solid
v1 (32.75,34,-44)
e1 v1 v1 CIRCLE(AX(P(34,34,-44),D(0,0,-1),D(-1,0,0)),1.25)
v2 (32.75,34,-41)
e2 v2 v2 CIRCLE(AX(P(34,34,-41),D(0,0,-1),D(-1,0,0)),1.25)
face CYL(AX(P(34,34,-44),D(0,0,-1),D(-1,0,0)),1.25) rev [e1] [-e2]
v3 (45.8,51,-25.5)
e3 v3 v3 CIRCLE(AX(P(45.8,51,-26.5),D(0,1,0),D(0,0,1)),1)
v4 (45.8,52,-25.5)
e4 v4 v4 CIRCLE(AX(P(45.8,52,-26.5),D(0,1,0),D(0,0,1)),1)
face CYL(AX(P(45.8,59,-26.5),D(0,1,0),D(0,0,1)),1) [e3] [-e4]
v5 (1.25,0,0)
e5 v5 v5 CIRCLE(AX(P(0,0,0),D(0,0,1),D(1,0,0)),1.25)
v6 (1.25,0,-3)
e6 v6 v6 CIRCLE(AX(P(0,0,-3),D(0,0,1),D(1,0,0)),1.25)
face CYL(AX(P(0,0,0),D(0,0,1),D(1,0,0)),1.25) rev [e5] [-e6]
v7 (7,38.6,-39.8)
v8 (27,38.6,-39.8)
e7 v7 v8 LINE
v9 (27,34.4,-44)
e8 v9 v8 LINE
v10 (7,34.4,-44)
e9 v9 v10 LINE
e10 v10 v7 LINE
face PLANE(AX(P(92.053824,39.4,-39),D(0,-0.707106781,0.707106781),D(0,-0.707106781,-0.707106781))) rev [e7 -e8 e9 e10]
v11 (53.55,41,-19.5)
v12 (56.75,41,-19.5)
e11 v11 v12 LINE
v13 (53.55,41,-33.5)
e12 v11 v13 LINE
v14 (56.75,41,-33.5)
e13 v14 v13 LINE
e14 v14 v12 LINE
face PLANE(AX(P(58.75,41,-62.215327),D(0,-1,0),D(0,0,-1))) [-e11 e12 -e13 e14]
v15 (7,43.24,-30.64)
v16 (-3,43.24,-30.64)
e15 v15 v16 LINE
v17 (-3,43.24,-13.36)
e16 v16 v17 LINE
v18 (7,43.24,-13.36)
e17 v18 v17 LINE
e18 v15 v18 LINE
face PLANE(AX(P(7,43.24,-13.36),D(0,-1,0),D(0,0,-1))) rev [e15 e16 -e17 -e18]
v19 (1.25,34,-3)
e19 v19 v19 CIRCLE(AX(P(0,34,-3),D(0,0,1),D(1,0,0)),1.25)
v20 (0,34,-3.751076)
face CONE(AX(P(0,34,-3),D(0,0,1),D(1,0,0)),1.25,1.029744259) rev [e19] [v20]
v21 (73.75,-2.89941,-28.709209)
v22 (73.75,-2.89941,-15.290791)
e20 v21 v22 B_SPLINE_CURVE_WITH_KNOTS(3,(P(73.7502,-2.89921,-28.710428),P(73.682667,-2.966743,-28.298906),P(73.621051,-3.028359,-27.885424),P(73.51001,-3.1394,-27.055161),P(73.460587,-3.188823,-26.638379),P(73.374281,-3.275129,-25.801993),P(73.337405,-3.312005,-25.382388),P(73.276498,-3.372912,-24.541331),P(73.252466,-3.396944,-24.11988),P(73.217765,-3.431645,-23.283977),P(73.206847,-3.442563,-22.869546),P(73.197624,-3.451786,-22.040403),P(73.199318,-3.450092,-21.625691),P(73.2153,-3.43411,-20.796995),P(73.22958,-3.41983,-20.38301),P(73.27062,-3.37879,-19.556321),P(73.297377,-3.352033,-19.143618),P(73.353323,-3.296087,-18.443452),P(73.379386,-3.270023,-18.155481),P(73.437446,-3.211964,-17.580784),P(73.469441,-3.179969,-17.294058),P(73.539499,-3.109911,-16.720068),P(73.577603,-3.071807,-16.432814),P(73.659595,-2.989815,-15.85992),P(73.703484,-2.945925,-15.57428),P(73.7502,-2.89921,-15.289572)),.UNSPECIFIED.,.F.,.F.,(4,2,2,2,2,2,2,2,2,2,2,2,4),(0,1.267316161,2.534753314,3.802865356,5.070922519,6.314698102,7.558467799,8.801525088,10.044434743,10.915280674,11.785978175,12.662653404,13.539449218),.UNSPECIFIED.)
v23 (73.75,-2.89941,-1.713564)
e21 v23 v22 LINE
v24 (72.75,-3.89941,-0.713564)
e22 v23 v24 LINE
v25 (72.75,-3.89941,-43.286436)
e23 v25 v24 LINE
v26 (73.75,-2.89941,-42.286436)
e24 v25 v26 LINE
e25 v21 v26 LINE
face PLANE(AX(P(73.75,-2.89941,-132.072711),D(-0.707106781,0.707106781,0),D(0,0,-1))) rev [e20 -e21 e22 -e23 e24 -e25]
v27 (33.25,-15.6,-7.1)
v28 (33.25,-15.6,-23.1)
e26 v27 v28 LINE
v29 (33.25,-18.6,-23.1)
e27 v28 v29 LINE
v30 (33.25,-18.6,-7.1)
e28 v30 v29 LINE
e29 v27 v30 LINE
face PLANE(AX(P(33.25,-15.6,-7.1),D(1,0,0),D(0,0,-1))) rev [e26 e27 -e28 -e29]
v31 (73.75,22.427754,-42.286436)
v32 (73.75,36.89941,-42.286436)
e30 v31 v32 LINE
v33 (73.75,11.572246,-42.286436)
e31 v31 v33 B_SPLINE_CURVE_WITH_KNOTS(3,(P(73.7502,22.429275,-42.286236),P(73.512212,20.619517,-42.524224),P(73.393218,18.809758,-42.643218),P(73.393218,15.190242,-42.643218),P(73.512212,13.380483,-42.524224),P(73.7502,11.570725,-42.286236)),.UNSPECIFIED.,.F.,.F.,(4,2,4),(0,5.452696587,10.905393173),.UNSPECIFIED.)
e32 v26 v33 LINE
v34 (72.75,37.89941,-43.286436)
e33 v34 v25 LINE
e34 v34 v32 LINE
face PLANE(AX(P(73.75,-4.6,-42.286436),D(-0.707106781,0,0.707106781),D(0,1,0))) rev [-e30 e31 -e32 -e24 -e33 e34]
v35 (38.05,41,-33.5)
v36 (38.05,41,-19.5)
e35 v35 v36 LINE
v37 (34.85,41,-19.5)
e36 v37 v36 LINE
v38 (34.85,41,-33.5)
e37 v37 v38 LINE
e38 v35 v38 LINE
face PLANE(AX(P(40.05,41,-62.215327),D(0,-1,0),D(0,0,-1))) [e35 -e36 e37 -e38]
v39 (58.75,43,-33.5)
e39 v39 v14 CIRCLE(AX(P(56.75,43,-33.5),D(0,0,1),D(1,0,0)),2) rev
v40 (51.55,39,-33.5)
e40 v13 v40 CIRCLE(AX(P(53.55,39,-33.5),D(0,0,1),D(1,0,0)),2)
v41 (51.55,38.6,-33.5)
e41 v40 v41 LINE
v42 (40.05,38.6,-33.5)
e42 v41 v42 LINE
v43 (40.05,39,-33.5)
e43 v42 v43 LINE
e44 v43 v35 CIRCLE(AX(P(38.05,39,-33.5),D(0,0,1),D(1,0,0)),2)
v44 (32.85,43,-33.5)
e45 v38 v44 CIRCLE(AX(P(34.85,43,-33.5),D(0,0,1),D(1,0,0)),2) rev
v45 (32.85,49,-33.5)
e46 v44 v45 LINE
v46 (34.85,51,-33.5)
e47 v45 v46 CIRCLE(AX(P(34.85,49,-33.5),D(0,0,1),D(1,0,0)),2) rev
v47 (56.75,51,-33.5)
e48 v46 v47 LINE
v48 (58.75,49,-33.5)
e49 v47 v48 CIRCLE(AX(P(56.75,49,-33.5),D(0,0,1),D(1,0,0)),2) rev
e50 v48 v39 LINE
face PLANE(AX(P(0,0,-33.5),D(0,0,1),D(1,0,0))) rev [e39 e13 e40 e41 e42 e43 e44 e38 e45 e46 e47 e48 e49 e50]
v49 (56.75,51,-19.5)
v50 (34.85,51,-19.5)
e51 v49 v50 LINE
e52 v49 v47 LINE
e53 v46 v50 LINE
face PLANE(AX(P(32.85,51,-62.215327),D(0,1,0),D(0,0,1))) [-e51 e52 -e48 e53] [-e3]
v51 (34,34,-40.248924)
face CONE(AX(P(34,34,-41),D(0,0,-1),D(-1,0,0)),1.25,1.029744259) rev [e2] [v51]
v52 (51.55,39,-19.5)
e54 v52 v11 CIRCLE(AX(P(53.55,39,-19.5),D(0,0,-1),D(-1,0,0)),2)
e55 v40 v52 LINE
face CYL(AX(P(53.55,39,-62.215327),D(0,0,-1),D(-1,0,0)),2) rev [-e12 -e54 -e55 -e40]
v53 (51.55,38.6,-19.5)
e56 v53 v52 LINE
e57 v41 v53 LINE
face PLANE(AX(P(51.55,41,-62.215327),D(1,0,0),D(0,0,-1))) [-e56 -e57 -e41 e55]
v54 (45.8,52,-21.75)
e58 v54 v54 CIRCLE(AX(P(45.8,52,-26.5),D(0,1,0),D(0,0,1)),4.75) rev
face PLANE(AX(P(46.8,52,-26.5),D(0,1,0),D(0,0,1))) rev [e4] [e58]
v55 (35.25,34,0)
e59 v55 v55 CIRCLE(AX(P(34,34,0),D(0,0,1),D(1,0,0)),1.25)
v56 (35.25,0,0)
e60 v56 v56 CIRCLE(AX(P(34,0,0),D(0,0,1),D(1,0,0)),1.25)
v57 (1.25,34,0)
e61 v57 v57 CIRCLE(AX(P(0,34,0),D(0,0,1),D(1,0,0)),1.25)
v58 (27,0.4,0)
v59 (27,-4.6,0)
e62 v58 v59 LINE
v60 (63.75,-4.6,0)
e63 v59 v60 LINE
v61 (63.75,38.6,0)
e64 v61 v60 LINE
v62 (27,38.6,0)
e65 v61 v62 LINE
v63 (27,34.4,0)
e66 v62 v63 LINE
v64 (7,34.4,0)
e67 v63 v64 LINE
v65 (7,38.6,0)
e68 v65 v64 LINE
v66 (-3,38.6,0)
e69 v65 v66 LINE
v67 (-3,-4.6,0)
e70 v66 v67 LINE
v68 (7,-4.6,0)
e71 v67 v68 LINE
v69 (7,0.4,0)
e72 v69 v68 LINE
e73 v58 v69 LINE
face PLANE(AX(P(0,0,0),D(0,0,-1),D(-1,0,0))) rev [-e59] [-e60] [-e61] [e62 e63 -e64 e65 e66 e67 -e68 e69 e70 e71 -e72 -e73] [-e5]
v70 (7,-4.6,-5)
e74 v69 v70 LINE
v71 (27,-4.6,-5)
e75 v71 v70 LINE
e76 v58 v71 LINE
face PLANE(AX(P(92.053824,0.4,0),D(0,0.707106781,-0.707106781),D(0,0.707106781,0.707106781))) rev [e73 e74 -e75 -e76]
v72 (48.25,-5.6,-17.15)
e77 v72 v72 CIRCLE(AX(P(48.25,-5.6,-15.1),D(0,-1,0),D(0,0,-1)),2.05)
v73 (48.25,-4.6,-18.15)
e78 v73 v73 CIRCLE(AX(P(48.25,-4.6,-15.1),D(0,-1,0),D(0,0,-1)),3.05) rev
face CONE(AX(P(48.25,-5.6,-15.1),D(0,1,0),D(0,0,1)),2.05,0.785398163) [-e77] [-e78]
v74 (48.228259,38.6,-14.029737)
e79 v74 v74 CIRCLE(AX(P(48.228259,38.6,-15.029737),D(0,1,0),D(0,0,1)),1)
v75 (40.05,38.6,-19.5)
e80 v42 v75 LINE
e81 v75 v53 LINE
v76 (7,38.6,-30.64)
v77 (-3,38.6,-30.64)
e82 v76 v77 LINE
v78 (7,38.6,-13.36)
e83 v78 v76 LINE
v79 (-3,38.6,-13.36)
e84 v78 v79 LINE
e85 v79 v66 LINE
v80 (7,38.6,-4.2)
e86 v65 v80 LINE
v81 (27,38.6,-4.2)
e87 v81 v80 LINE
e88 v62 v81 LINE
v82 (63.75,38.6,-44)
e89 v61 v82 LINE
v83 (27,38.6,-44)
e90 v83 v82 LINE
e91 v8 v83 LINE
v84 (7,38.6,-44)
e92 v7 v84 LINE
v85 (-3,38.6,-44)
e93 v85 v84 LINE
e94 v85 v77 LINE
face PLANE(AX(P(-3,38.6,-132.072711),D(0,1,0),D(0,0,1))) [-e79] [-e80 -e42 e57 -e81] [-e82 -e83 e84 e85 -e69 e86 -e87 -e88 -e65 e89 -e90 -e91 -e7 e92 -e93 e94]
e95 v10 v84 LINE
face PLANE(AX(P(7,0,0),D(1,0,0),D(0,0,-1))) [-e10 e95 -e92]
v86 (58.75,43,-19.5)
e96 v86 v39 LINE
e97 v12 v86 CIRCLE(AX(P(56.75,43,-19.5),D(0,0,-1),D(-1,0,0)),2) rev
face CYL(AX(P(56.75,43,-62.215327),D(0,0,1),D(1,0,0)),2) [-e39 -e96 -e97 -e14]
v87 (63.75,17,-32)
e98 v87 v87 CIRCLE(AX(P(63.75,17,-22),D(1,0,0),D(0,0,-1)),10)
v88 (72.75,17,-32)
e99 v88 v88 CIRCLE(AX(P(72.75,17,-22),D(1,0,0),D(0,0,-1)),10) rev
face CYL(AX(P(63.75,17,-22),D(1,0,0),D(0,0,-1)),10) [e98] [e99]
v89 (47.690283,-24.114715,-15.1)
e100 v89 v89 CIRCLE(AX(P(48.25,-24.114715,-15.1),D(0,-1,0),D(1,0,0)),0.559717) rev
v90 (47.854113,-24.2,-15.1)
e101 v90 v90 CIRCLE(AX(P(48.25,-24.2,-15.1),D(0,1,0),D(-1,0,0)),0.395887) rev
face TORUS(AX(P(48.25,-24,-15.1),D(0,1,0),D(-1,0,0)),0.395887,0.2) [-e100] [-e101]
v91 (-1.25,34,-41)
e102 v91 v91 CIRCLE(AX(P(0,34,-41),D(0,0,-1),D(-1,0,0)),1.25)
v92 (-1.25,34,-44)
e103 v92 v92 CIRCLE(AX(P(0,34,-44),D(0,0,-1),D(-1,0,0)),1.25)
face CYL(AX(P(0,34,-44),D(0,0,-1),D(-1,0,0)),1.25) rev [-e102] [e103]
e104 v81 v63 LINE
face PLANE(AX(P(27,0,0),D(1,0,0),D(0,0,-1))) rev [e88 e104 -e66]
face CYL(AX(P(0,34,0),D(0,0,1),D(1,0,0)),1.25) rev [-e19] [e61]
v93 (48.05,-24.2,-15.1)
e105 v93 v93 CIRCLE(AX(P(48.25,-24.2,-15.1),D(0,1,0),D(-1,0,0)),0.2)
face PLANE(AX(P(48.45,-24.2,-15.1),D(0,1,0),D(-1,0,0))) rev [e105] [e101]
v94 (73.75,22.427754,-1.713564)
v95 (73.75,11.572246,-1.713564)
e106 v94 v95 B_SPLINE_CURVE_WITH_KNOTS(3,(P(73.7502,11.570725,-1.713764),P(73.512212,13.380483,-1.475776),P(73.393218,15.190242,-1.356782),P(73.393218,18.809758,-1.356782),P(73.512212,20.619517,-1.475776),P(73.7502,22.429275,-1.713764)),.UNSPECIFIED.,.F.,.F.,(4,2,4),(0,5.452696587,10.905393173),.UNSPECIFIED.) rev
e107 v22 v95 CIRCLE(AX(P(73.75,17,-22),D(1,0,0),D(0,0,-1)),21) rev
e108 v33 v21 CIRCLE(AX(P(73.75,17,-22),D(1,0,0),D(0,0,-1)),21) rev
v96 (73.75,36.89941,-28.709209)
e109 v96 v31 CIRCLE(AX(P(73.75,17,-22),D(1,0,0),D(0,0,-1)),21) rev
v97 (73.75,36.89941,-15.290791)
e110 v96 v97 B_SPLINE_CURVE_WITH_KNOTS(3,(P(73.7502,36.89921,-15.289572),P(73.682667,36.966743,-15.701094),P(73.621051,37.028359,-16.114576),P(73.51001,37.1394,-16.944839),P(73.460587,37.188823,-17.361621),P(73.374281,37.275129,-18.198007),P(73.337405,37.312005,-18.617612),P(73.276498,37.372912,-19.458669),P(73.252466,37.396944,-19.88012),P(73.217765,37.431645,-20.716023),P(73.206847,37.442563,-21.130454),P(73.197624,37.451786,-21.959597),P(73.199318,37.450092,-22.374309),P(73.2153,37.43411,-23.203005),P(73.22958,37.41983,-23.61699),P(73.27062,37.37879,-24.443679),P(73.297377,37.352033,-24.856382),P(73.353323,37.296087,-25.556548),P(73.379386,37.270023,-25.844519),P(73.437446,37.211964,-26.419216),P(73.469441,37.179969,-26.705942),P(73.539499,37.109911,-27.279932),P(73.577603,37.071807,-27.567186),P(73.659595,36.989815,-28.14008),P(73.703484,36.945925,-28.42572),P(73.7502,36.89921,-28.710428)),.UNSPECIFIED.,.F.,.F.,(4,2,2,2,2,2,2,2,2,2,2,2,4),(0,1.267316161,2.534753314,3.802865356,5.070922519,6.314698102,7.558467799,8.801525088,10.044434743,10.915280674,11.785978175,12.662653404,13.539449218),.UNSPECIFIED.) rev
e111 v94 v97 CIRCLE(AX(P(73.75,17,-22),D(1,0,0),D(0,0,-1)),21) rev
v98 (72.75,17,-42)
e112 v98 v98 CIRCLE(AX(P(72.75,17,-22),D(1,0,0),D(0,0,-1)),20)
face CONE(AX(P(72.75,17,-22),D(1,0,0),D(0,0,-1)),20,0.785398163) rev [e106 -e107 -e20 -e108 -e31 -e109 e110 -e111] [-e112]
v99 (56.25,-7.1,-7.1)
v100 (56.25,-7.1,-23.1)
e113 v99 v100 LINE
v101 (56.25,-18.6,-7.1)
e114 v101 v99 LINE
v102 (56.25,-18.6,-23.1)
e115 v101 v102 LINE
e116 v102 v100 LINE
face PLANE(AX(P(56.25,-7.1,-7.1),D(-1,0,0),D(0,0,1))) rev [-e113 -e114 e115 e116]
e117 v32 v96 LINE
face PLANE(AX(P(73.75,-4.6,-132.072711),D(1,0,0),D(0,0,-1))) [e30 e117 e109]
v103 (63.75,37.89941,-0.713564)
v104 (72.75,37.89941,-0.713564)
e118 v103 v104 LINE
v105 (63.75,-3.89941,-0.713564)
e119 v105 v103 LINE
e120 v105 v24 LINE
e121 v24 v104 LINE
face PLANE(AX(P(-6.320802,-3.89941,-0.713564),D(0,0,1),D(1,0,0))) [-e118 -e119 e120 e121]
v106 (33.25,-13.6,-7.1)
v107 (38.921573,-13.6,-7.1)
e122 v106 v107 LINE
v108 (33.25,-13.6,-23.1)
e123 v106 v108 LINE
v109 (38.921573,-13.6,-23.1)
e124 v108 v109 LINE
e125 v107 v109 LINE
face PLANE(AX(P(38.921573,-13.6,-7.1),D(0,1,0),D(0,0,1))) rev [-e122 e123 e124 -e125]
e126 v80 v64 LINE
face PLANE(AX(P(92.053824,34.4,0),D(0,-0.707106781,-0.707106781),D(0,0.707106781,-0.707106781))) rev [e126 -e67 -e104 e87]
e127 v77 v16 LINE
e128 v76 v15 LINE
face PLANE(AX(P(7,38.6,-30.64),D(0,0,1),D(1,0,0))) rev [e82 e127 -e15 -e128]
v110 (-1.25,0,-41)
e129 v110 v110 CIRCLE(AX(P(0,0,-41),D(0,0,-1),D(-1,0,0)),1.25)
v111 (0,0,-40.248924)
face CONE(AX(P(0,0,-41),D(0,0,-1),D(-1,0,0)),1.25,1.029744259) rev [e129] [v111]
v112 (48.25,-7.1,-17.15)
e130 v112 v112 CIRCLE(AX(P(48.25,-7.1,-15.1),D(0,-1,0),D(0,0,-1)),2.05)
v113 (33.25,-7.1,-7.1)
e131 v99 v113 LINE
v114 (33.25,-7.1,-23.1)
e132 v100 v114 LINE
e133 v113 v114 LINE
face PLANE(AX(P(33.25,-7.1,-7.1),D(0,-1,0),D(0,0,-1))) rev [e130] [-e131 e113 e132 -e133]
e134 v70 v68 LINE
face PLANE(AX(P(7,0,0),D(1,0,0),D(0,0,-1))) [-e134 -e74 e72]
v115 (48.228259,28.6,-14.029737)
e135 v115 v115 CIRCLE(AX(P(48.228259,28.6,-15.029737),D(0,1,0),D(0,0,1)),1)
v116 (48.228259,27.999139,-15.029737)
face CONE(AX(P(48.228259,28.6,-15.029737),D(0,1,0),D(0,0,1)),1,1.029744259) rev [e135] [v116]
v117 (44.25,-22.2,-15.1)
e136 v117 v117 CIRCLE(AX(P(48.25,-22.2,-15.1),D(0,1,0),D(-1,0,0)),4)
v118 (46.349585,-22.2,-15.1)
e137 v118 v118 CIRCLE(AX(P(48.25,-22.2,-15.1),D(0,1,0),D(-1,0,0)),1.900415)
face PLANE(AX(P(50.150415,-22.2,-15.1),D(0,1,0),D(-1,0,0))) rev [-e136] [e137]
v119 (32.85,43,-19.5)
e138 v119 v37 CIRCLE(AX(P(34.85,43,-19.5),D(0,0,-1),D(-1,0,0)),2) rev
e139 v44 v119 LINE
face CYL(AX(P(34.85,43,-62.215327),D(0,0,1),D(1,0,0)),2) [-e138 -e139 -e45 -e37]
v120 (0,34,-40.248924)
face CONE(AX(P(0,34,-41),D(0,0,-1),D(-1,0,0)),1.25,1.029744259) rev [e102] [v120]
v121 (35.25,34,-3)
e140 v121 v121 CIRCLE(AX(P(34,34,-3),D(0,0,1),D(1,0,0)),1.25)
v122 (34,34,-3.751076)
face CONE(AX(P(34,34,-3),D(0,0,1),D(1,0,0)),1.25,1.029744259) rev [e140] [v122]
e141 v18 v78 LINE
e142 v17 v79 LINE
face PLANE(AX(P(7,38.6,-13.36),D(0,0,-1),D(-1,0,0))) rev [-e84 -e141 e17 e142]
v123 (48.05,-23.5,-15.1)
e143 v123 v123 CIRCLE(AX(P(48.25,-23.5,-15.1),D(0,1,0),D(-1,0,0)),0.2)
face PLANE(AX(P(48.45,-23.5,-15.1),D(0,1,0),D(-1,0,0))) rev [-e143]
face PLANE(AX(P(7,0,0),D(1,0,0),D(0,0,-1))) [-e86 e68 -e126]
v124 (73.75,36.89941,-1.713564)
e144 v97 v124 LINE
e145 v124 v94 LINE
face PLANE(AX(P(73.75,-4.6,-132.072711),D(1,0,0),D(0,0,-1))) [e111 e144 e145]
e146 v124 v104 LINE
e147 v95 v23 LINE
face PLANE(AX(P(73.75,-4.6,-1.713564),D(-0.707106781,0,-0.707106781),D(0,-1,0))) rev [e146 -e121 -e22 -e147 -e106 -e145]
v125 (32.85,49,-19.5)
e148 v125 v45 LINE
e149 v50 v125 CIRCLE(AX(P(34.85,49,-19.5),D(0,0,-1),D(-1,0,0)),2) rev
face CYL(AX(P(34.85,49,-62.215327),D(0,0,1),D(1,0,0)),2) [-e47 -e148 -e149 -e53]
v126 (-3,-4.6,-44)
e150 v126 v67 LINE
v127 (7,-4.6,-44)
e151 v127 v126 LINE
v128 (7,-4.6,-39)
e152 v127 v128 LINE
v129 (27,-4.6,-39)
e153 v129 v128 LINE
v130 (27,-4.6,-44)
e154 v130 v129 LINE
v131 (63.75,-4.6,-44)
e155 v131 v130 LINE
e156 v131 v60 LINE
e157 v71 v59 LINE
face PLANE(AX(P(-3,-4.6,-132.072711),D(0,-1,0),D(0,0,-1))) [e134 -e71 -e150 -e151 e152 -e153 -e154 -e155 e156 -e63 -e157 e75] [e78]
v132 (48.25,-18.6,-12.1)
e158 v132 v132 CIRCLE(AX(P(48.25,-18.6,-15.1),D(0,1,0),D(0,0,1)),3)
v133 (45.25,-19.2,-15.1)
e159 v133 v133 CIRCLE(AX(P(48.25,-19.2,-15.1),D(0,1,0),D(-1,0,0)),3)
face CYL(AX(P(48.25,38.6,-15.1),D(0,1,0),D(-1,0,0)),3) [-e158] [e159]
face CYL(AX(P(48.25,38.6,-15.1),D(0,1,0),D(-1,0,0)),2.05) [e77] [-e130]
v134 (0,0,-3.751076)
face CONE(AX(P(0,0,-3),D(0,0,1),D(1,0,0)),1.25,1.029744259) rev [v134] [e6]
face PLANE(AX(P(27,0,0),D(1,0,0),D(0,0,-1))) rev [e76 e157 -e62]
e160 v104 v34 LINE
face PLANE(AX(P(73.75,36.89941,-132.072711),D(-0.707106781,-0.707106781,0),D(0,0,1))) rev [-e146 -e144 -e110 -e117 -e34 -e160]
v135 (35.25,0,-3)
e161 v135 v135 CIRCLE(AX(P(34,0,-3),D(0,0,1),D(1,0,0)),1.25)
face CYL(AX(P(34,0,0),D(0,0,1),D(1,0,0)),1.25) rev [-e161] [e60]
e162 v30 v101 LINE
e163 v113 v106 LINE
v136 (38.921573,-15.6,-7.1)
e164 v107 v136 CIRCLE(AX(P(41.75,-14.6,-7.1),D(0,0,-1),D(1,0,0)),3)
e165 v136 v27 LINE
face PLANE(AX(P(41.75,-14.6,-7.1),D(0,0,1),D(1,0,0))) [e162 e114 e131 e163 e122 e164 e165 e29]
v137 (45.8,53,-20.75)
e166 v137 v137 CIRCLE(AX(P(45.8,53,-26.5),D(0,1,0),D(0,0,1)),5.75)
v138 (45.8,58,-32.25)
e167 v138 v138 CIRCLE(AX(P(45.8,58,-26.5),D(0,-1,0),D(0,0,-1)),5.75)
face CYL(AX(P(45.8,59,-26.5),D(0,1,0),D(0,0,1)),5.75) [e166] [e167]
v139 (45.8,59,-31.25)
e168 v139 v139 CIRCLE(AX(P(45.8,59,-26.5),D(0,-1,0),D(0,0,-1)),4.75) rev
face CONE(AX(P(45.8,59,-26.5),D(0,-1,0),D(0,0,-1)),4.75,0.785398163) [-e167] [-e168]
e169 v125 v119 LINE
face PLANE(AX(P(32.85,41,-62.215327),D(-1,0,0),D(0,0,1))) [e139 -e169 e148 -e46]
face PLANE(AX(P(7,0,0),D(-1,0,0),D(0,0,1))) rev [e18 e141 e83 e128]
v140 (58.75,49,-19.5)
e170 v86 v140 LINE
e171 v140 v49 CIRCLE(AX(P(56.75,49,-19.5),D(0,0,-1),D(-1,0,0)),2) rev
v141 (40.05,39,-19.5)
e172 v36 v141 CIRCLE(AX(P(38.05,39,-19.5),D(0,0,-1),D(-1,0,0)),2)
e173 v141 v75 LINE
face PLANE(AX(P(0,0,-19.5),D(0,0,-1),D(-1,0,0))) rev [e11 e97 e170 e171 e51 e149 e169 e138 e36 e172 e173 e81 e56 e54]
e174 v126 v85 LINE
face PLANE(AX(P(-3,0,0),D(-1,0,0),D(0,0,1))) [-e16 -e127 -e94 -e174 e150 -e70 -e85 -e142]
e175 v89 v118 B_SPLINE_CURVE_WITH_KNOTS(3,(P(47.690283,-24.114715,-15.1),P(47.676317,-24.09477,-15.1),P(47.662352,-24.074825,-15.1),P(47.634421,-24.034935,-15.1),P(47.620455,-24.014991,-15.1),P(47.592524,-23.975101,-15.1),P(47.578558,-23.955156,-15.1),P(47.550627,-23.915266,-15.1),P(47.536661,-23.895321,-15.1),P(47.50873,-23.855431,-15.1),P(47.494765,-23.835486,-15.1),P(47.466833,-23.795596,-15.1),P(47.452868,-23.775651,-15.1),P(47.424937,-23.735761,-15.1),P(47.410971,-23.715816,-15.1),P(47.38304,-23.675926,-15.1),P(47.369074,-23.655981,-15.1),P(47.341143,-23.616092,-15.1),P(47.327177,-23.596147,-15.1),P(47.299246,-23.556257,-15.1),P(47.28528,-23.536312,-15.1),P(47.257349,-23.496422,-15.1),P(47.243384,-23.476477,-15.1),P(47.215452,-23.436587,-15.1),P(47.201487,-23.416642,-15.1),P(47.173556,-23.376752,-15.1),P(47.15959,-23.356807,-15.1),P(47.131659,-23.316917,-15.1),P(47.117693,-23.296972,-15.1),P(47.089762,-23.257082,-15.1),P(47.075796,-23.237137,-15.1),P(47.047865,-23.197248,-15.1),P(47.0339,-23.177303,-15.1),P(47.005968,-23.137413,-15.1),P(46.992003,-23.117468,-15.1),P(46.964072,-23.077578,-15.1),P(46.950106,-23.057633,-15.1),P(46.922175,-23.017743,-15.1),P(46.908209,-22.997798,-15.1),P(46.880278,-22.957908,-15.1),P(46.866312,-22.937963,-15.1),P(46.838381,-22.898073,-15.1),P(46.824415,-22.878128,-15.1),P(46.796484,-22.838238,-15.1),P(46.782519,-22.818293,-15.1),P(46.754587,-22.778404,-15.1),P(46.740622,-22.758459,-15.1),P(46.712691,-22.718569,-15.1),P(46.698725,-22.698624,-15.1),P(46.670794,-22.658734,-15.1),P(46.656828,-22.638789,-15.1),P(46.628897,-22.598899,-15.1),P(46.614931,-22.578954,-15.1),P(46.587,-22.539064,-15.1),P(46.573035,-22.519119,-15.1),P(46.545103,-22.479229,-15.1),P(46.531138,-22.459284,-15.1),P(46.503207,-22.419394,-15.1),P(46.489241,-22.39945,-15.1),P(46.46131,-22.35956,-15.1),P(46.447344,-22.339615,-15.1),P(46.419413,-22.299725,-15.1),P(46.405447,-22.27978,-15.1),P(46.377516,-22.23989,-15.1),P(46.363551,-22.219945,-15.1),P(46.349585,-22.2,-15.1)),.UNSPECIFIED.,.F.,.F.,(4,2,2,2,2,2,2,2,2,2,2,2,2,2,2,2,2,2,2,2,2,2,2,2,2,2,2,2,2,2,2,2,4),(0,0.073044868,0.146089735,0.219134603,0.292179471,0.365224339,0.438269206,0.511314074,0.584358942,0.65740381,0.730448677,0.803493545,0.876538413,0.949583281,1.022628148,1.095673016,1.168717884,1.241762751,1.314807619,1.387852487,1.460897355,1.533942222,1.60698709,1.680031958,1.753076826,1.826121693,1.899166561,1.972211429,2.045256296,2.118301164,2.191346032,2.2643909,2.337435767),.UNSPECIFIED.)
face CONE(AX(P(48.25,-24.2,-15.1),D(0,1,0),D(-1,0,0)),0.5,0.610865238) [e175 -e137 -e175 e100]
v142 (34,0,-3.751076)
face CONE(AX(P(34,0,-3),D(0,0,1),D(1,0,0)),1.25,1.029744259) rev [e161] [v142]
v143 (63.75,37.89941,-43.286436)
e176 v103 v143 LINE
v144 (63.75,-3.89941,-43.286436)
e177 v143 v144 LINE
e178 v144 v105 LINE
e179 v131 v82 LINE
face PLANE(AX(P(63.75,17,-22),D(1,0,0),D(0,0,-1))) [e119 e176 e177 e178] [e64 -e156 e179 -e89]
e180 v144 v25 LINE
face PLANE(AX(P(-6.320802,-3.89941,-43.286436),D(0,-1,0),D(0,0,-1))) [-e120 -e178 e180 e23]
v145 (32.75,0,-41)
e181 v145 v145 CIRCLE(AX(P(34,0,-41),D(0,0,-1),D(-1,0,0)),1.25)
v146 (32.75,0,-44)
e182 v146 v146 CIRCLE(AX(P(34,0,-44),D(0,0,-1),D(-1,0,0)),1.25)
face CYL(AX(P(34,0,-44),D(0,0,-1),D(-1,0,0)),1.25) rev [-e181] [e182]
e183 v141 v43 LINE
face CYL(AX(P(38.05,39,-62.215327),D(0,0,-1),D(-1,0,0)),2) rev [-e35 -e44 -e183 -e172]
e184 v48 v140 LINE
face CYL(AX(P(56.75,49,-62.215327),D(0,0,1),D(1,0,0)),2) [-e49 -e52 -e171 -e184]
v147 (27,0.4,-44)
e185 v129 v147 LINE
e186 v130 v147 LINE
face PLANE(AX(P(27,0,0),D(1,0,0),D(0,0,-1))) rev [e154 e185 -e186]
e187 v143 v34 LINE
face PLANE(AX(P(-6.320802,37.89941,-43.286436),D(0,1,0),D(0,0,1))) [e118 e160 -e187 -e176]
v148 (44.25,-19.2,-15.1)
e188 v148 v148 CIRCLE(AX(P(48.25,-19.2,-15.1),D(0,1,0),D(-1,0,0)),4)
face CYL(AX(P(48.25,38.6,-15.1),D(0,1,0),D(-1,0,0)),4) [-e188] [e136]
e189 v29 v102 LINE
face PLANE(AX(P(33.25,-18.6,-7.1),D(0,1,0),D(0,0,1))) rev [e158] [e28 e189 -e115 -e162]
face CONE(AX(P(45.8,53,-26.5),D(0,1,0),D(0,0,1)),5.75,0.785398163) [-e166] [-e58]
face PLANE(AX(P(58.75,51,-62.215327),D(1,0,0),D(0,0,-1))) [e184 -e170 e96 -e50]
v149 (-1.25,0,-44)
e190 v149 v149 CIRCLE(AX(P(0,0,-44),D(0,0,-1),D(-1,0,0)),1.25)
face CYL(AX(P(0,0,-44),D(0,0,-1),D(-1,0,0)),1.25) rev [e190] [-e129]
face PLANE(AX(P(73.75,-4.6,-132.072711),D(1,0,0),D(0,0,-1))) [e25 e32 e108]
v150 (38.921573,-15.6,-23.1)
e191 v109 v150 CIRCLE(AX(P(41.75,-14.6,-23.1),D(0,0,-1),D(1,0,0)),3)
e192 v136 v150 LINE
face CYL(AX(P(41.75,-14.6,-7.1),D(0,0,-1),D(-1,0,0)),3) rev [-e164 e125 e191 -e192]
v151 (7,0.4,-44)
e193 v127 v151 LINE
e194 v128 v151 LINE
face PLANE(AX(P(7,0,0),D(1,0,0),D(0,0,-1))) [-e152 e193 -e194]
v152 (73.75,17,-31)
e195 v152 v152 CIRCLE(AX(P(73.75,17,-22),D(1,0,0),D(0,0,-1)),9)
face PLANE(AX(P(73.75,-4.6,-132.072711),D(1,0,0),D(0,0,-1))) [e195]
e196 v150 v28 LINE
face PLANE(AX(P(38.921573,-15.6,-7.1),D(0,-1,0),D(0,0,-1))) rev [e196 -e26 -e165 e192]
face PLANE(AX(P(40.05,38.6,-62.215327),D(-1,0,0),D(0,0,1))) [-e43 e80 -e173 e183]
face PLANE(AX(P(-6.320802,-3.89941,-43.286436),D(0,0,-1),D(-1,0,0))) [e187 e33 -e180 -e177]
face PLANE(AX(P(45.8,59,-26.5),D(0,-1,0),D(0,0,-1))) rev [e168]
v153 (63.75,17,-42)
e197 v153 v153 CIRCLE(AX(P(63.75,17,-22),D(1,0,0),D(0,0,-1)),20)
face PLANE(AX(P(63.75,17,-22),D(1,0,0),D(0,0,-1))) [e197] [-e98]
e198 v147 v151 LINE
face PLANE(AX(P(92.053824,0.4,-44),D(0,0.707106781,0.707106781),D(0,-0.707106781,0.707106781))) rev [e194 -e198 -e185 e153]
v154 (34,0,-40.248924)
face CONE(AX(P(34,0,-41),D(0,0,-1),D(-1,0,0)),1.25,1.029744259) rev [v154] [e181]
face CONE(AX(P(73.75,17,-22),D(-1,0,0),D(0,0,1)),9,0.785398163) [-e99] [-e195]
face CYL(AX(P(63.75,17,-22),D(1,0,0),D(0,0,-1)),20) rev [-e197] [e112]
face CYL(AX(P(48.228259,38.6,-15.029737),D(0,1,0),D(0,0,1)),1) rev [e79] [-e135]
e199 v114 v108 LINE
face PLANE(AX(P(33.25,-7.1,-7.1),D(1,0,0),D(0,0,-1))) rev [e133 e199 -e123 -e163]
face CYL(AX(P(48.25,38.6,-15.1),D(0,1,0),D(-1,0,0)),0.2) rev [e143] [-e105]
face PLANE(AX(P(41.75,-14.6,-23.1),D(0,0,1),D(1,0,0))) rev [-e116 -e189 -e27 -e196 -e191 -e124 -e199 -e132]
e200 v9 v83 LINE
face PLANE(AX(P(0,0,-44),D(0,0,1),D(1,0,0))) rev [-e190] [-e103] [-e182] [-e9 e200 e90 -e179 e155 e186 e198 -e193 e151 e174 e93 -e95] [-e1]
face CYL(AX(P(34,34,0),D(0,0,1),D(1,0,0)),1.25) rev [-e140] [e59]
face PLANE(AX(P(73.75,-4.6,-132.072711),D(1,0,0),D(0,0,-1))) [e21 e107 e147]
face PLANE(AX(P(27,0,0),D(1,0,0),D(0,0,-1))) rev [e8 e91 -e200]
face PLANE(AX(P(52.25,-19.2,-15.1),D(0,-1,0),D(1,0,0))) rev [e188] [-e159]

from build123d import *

# Parameters (mm, degrees)
MAIN_BLOCK_SKETCH_W            = 76.75
MAIN_BLOCK_SKETCH_H            = 43.2
MAIN_BLOCK_DEPTH               = 44
HEATER_BLOCK_DEPTH             = 8
JST_CONNECTOR_SKETCH_W         = 17.28
JST_CONNECTOR_SKETCH_H         = 4.64
JST_CONNECTOR_BLOCK_DEPTH      = 10
IDLER_BLOCK_DEPTH              = 14
MOTOR_INSET_CUTOUT_SKETCH_W    = 46
MOTOR_INSET_CUTOUT_SKETCH_H    = 46
MOTOR_INSET_DEPTH              = 20
FAN_SKETCH_R                   = 20
FAN_SKETCH_R_2                 = 10
MAIN_FAN_ROTOR_CUT_DEPTH       = 10
FAN_EDGE_CUT_SKETCH_W          = 50
FAN_EDGE_CUT_SKETCH_H          = 49.09090909
FAN_EDGE_CUT_SKETCH_W_2        = 42.57287206
FAN_EDGE_CUT_SKETCH_H_2        = 41.79881984
FAN_HOUSING_CUT_DEPTH          = 10
MOUNTING_HOLES_NEAR_SIDE_D     = 2.5
MOUNTING_HOLES_NEAR_SIDE_DEPTH = 3
MOUNTING_HOLES_NEAR_SIDE_TIP   = 0.751075774
MOUNTING_HOLES_FAR_SIDE_D      = 2.5
MOUNTING_HOLES_FAR_SIDE_DEPTH  = 3
MOUNTING_HOLES_FAR_SIDE_TIP    = 0.751075774
FILAMENT_HOLE_D                = 2
FILAMENT_HOLE_DEPTH            = 10
FILAMENT_HOLE_TIP              = 0.600860619
COSMETIC_CHAMFERS_SIZE         = 1
TENSION_ARM_FILLETS_R          = 2
NOZZLE_FILLET_R                = 0.2


with BuildPart() as part:
    # Main Block Sketch → Main Block (new body)
    with BuildSketch(Plane.XY):
        with Locations((35.375, 17)):
            Rectangle(MAIN_BLOCK_SKETCH_W, MAIN_BLOCK_SKETCH_H)
    extrude(amount=-MAIN_BLOCK_DEPTH)


with BuildPart() as body_2:
    # Nozzle +Heatbreak Sketch → Nozzle+heatbreak (revolve)
    with BuildSketch(Plane.XY.offset(-15.1), mode=Mode.PRIVATE) as nozzle_heatbreak_sk:
        Polygon((48.25, -11.7), (48.25, -23.5), (48.45, -23.5), (48.45, -24.2), (48.75, -24.2), (50.150415076, -22.2), (52.25, -22.2), (52.25, -19.2), (51.25, -19.2), (51.25, -11.7), (50.3, -11.7), (50.3, -4.6), (50.3, -3.6), (48.25, -3.6), (48.25, -4.6), align=None)
    revolve(nozzle_heatbreak_sk.sketch.rotate(Axis((48.25, 38.6, -15.1), (0, -1, 0)), 180), axis=Axis((48.25, 38.6, -15.1), (0, -1, 0)))

    # Heater Block Sketch → Heater Block (add, symmetric)
    with BuildSketch(Plane.XY.offset(-15.1)):
        with BuildLine():
            Line((38.921572875, -13.6), (33.25, -13.6))
            Line((33.25, -13.6), (33.25, -7.1))
            Line((33.25, -7.1), (56.25, -7.1))
            Line((56.25, -7.1), (56.25, -18.6))
            Line((56.25, -18.6), (33.25, -18.6))
            Line((33.25, -18.6), (33.25, -15.6))
            Line((33.25, -15.6), (38.921572875, -15.6))
            ThreePointArc((38.921572875, -15.6), (44.75, -14.6), (38.921572875, -13.6))
        make_face()
    extrude(amount=HEATER_BLOCK_DEPTH, both=True)


with BuildPart() as body_3:
    # JST Connector Sketch → JST Connector Block (new body)
    with BuildSketch(Plane(origin=(-3, 0, 0), x_dir=(0, 0, -1), z_dir=(1, 0, 0))):
        with Locations((22, 40.92)):
            Rectangle(JST_CONNECTOR_SKETCH_W, JST_CONNECTOR_SKETCH_H)
    extrude(amount=JST_CONNECTOR_BLOCK_DEPTH)


with BuildPart() as body_4:
    # Idler Block Sketch → Idler Block (new body)
    with BuildSketch(Plane.XY.offset(-19.5)):
        Polygon((40.05, 38.6), (40.05, 41), (32.85, 41), (32.85, 51), (58.75, 51), (58.75, 41), (51.55, 41), (51.55, 38.6), align=None)
    extrude(amount=-IDLER_BLOCK_DEPTH)


with BuildPart() as body_5:
    # Tension knob sketch → Tension Knob (revolve)
    with BuildSketch(Plane.XY.offset(-26.5), mode=Mode.PRIVATE) as tension_knob_sk:
        Polygon((46.8, 52), (46.8, 49), (45.8, 49), (45.8, 52), (45.8, 59), (51.55, 59), (51.55, 52), align=None)
    revolve(tension_knob_sk.sketch.rotate(Axis((45.8, 59, -26.5), (0, -1, 0)), 90), axis=Axis((45.8, 59, -26.5), (0, -1, 0)))

    # Combination of Parts: union body 4, body 3, body 2, part
    add(body_4.part)
    add(body_3.part)
    add(body_2.part)
    add(part.part)

    # Motor Inset Cutout Sketch → Motor Inset (cut)
    with BuildSketch(Plane(origin=(7, 0, 0), x_dir=(0, 0, -1), z_dir=(1, 0, 0))):
        with Locations((22, 17.4)):
            Rectangle(MOTOR_INSET_CUTOUT_SKETCH_W, MOTOR_INSET_CUTOUT_SKETCH_H)
        Polygon((5, 39.4), (39, 39.4), (44, 34.4), (44, 0.4), (39, -4.6), (5, -4.6), (0, 0.4), (0, 34.4), align=None, mode=Mode.SUBTRACT)
    extrude(amount=MOTOR_INSET_DEPTH, mode=Mode.SUBTRACT)

    # Fan Sketch → Main Fan Rotor Cut (cut)
    with BuildSketch(Plane(origin=(73.75, 0, 0), x_dir=(0, 0, -1), z_dir=(1, 0, 0))):
        with Locations((22, 17)):
            Circle(FAN_SKETCH_R)
        with Locations((22, 17)):
            Circle(FAN_SKETCH_R_2, mode=Mode.SUBTRACT)
    extrude(amount=-MAIN_FAN_ROTOR_CUT_DEPTH, mode=Mode.SUBTRACT)

    # Fan Edge Cut Sketch → Fan Housing Cut (cut)
    with BuildSketch(Plane(origin=(73.75, 0, 0), x_dir=(0, 0, -1), z_dir=(1, 0, 0))):
        with Locations((22, 17)):
            Rectangle(FAN_EDGE_CUT_SKETCH_W, FAN_EDGE_CUT_SKETCH_H)
        with Locations((22, 17)):
            Rectangle(FAN_EDGE_CUT_SKETCH_W_2, FAN_EDGE_CUT_SKETCH_H_2, mode=Mode.SUBTRACT)
    extrude(amount=-FAN_HOUSING_CUT_DEPTH, mode=Mode.SUBTRACT)

    # Mounting Holes Near Side
    with Locations(Plane.XY):
        with Locations((0, 34), (0, 0), (34, 0), (34, 34)):
            Hole(MOUNTING_HOLES_NEAR_SIDE_D / 2, depth=MOUNTING_HOLES_NEAR_SIDE_DEPTH)
            with Locations((0, 0, -(MOUNTING_HOLES_NEAR_SIDE_DEPTH + MOUNTING_HOLES_NEAR_SIDE_TIP / 2))):  # 118° drill point
                Cone(0, MOUNTING_HOLES_NEAR_SIDE_D / 2, MOUNTING_HOLES_NEAR_SIDE_TIP, mode=Mode.SUBTRACT)

    # Mounting Holes Far Side
    with Locations(Plane(origin=(0, 0, -44), x_dir=(1, 0, 0), z_dir=(0, 0, -1))):
        with Locations((0, 0), (34, 0), (34, -34), (0, -34)):
            Hole(MOUNTING_HOLES_FAR_SIDE_D / 2, depth=MOUNTING_HOLES_FAR_SIDE_DEPTH)
            with Locations((0, 0, -(MOUNTING_HOLES_FAR_SIDE_DEPTH + MOUNTING_HOLES_FAR_SIDE_TIP / 2))):  # 118° drill point
                Cone(0, MOUNTING_HOLES_FAR_SIDE_D / 2, MOUNTING_HOLES_FAR_SIDE_TIP, mode=Mode.SUBTRACT)

    # Filament Hole
    with Locations(Plane(origin=(0, 38.6, 0), x_dir=(1, 0, 0), z_dir=(0, 1, 0))):
        with Locations((48.228258832, 15.029737369)):
            Hole(FILAMENT_HOLE_D / 2, depth=FILAMENT_HOLE_DEPTH)
            with Locations((0, 0, -(FILAMENT_HOLE_DEPTH + FILAMENT_HOLE_TIP / 2))):  # 118° drill point
                Cone(0, FILAMENT_HOLE_D / 2, FILAMENT_HOLE_TIP, mode=Mode.SUBTRACT)

    # Cosmetic Chamfers
    # the kernel refuses this chamfer: 1 mm, written as the material it adds along each edge
    with BuildSketch(Plane(origin=(48.25, -4.6, -15.1), x_dir=(-1, 0, 0), z_dir=(0, 0, -1))) as cosmetic_chamfers_piece_1:
        Polygon((2.05 + COSMETIC_CHAMFERS_SIZE, 0), (2.05, -COSMETIC_CHAMFERS_SIZE), (2.05, 0), align=None)
    revolve(axis=Axis((48.25, -4.6, -15.1), (0, 1, 0)))
    # the kernel refuses this chamfer: 1 mm, written as the material it takes off along each edge
    with BuildSketch(Plane(origin=(73.75, 17, -22), x_dir=(0, 0, -1), z_dir=(0, -1, 0))) as cosmetic_chamfers_2_piece_1:
        Polygon((20 + COSMETIC_CHAMFERS_SIZE, 0), (20, -COSMETIC_CHAMFERS_SIZE), (20, 0), align=None)
    revolve(axis=Axis((73.75, 17, -22), (1, 0, 0)), mode=Mode.SUBTRACT)
    with BuildSketch(Plane(origin=(73.75, 17, -22), x_dir=(0, 0, -1), z_dir=(0, -1, 0))) as cosmetic_chamfers_2_piece_2:
        Polygon((10, -COSMETIC_CHAMFERS_SIZE), (10 - COSMETIC_CHAMFERS_SIZE, 0), (10, 0), align=None)
    revolve(axis=Axis((73.75, 17, -22), (1, 0, 0)), mode=Mode.SUBTRACT)
    with BuildSketch(Plane(origin=(73.75, 37.89940992, 1.858119018), x_dir=(-0.9996219169112968, 0.027495876610589196, 0), z_dir=(0, 0, -1)), Plane(origin=(73.75, -3.89940992, -45.858119018), x_dir=(-0.9996219169112968, -0.027495876610586605, 0), z_dir=(0, 0, 1))) as cosmetic_chamfers_2_piece_3:
        Polygon((COSMETIC_CHAMFERS_SIZE * 0.999621916911, -COSMETIC_CHAMFERS_SIZE * 0.0274958766106), (-COSMETIC_CHAMFERS_SIZE * 0.0274958766106, -COSMETIC_CHAMFERS_SIZE * 0.999621916911), (0, 0), align=None)
    extrude(amount=47.716238035, mode=Mode.SUBTRACT)
    with BuildSketch(Plane(origin=(73.75, -6.471092908, -0.71356397), x_dir=(-0.9996219169112968, 0, 0.027495876610586497), z_dir=(0, 1, 0)), Plane(origin=(73.75, 40.471092908, -43.28643603), x_dir=(-0.9996219169112968, 0, -0.027495876610589196), z_dir=(0, -1, 0))) as cosmetic_chamfers_2_piece_4:
        Polygon((COSMETIC_CHAMFERS_SIZE * 0.999621916911, -COSMETIC_CHAMFERS_SIZE * 0.0274958766106), (-COSMETIC_CHAMFERS_SIZE * 0.0274958766106, -COSMETIC_CHAMFERS_SIZE * 0.999621916911), (0, 0), align=None)
    extrude(amount=46.942185816, mode=Mode.SUBTRACT)
    with BuildSketch(Plane(origin=(45.8, 52, -26.5), x_dir=(0, 0, 1), z_dir=(1, 0, 0))) as cosmetic_chamfers_2_piece_5:
        Polygon((5.75 - COSMETIC_CHAMFERS_SIZE, 0), (5.75, -COSMETIC_CHAMFERS_SIZE), (5.75, 0), align=None)
    revolve(axis=Axis((45.8, 52, -26.5), (0, -1, 0)), mode=Mode.SUBTRACT)
    with BuildSketch(Plane(origin=(45.8, 59, -26.5), x_dir=(0, 0, 1), z_dir=(1, 0, 0))) as cosmetic_chamfers_2_piece_6:
        Polygon((5.75, COSMETIC_CHAMFERS_SIZE), (5.75 - COSMETIC_CHAMFERS_SIZE, 0), (5.75, 0), align=None)
    revolve(axis=Axis((45.8, 59, -26.5), (0, -1, 0)), mode=Mode.SUBTRACT)

    # Tension Arm Fillets
    tension_arm_fillets_edges = [body_5.edges().sort_by_distance(p)[0] for p in [
        (40.05, 41, -26.5),
        (32.85, 41, -26.5),
        (32.85, 51, -26.5),
        (58.75, 51, -26.5),
        (58.75, 41, -26.5),
        (51.55, 41, -26.5),
    ]]
    fillet(tension_arm_fillets_edges, radius=TENSION_ARM_FILLETS_R)

    # Nozzle Fillet
    nozzle_fillet_edges = [body_5.edges().sort_by_distance(p)[0] for p in [
        (48.75, -24.2, -15.1),
    ]]
    fillet(nozzle_fillet_edges, radius=NOZZLE_FILLET_R)


solid = body_5.part
